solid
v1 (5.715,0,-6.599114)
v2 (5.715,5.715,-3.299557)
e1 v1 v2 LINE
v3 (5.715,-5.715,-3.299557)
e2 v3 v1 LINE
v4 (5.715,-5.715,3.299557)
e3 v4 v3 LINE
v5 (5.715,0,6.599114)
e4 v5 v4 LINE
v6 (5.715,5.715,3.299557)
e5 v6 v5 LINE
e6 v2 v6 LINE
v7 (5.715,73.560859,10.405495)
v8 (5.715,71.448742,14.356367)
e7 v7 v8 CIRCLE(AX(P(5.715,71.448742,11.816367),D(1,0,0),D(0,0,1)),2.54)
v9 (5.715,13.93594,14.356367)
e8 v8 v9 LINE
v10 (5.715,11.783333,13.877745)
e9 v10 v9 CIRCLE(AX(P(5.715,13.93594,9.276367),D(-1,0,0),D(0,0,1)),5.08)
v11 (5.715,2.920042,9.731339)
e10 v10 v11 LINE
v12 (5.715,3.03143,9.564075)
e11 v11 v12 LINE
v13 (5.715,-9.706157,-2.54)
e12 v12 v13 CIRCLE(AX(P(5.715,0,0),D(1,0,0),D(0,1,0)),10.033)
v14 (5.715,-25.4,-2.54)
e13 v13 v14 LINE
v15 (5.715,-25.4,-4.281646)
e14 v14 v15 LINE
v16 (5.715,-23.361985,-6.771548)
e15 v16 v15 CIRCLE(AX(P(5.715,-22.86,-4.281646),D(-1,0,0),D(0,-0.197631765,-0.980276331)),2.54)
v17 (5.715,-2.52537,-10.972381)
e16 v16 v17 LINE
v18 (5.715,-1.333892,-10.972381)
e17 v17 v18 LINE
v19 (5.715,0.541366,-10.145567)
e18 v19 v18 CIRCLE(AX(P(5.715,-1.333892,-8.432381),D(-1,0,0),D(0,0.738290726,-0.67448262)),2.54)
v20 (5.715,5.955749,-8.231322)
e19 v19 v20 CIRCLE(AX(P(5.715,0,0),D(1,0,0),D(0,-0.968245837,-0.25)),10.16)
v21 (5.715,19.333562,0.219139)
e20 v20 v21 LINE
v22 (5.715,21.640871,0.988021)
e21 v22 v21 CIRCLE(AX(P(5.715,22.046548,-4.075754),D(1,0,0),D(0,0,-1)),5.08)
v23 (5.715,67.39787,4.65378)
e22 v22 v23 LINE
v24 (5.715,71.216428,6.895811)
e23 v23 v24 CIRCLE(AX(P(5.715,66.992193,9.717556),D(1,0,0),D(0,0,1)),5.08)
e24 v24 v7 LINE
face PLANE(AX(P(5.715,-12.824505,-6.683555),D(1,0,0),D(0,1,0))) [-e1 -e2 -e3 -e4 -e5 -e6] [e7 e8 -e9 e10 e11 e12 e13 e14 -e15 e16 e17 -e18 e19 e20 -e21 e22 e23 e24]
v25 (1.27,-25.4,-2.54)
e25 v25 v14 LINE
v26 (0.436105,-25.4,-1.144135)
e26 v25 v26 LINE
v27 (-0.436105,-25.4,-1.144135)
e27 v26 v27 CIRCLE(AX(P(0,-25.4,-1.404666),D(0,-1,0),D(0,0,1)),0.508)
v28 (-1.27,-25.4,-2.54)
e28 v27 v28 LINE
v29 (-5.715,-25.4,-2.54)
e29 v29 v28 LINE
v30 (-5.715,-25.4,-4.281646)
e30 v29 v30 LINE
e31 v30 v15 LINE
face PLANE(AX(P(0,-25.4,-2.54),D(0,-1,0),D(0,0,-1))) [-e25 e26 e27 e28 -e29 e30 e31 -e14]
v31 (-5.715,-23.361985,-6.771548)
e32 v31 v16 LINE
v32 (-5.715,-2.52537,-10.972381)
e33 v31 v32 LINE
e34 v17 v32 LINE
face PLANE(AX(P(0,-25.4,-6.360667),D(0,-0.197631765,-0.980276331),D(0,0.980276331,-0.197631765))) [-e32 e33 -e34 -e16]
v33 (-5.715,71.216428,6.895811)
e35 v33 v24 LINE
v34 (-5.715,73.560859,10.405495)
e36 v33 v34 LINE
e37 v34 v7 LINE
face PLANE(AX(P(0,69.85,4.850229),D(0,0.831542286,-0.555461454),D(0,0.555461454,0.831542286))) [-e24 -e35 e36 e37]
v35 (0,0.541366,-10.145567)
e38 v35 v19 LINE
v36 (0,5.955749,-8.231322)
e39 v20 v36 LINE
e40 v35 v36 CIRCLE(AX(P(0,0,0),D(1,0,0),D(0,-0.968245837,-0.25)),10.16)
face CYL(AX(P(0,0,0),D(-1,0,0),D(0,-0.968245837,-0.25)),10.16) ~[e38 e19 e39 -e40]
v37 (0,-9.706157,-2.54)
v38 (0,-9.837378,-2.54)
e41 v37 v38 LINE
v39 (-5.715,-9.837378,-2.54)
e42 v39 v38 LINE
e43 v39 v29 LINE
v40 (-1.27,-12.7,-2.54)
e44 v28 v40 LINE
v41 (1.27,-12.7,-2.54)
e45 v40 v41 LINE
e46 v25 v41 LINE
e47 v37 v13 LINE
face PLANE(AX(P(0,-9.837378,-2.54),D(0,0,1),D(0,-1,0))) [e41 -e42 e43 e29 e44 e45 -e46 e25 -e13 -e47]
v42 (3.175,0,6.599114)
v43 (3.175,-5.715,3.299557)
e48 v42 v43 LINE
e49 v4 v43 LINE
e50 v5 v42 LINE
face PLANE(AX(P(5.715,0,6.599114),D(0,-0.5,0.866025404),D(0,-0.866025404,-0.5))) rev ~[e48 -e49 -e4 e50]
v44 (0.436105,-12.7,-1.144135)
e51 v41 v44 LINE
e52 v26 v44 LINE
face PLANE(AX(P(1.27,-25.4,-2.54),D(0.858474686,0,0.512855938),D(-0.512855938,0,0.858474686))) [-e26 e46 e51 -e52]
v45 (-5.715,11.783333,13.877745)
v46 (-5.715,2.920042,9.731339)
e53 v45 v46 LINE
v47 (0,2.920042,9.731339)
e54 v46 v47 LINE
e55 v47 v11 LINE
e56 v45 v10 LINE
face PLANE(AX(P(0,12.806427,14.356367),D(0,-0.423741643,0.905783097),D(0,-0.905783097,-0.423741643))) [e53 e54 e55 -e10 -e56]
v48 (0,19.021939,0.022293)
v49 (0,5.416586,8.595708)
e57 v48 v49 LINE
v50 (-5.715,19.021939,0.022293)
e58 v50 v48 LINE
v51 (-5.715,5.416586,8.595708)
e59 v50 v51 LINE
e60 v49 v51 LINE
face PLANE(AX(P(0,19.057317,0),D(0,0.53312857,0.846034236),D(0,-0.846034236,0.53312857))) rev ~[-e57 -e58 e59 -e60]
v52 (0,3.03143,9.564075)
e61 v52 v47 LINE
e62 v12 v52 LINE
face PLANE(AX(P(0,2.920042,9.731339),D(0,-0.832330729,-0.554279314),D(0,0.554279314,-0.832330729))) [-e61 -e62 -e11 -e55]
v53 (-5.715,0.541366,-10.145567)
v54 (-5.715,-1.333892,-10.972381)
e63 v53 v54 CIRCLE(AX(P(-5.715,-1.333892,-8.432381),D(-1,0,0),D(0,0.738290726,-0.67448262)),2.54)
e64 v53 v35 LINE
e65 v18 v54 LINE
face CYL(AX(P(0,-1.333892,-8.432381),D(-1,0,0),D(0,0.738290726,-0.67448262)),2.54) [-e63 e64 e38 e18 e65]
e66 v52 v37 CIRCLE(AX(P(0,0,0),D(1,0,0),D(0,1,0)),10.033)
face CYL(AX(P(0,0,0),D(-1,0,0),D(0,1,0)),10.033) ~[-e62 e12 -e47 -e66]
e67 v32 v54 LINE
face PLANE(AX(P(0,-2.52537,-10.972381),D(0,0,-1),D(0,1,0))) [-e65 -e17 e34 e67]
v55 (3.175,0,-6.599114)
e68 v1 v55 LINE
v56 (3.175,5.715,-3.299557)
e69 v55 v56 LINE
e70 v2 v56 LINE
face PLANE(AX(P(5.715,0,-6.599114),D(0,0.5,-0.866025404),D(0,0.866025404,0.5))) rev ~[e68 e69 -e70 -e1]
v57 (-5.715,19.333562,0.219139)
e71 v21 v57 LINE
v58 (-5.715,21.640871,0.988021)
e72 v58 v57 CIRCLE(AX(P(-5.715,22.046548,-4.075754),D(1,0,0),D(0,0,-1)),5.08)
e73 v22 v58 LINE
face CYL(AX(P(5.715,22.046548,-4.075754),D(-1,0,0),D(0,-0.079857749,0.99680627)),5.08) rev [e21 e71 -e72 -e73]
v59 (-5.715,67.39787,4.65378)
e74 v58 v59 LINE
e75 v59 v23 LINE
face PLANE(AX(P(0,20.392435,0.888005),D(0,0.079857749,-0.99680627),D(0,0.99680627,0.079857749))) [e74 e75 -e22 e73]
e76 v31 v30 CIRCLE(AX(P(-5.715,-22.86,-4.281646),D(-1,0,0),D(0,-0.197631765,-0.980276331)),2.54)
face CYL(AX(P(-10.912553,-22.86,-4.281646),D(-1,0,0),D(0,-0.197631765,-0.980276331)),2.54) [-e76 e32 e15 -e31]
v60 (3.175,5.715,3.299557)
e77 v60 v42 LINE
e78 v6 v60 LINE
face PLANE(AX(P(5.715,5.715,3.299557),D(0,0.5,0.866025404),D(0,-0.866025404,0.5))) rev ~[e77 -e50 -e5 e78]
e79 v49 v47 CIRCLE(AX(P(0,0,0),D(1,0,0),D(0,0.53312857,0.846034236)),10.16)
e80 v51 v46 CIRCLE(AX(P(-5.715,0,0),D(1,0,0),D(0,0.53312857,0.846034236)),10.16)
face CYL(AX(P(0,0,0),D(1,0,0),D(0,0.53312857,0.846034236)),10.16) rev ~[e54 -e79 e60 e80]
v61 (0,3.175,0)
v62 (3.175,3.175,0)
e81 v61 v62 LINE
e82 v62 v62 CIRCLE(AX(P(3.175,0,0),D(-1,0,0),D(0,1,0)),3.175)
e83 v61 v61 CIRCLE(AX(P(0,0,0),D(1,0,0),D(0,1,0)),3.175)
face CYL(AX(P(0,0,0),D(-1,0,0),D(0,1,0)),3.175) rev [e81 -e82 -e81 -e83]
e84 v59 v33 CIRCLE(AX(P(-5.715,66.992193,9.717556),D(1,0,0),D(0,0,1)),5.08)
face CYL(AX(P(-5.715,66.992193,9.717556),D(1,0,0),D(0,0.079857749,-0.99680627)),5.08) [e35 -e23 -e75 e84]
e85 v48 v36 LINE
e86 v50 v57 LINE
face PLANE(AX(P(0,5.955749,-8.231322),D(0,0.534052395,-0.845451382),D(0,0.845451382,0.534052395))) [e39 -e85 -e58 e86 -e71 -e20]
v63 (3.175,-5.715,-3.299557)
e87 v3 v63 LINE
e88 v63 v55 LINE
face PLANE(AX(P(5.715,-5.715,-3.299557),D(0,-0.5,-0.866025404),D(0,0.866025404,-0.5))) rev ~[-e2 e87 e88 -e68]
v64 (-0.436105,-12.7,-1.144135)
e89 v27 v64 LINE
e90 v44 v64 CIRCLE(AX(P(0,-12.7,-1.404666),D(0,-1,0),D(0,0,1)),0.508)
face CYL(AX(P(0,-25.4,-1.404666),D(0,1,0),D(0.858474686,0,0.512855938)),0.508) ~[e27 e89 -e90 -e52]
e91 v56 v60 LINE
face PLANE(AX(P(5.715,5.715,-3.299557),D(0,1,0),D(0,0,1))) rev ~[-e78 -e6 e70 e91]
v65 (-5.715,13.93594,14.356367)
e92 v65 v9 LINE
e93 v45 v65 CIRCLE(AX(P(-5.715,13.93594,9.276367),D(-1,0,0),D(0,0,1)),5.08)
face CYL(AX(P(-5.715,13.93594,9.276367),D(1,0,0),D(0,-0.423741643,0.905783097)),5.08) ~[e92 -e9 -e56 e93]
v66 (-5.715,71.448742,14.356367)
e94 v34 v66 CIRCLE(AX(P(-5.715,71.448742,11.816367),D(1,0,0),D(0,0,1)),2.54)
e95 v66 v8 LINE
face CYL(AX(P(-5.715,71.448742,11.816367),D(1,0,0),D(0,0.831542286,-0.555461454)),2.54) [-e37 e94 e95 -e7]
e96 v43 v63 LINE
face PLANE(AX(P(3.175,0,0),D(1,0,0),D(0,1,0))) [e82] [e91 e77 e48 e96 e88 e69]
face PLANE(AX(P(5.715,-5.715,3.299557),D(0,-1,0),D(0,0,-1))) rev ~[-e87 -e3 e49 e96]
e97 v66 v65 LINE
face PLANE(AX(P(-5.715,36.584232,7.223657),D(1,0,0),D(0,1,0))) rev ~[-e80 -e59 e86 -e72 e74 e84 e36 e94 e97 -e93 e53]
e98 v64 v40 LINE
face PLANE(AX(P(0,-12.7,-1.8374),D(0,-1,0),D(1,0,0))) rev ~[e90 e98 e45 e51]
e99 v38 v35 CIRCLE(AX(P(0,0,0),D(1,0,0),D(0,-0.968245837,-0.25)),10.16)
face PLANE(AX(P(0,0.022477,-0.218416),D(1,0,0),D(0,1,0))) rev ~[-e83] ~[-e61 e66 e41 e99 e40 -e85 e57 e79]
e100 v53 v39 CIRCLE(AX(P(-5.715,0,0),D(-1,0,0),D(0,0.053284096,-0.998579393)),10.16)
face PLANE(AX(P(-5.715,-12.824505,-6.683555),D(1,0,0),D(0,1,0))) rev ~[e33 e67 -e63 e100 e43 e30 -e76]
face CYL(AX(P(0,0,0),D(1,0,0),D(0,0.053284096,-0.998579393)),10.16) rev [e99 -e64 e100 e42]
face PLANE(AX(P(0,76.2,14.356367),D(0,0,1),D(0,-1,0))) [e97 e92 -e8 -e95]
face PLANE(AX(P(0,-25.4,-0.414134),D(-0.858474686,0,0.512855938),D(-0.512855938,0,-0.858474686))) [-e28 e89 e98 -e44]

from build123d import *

# Parameters (mm, degrees)
F2_DEPTH     = 5.715
F3_R         = 5.08
F4_R         = 2.54
F0_R         = 3.175
F5_DEPTH     = 5.715
F7_DEPTH     = 25.4
F9_DEPTH     = 5.715
F10_T1_DEPTH = 10.4031462071
F10_T3_DEPTH = 10.4031460084
F10_T5_DEPTH = 21.8251062119
F12_DEPTH    = 12.7
F13_R        = 0.508
F15_DEPTH    = 2.54


# Not quite as in the source:
# - a fillet or chamfer that OpenCascade refuses, or shapes differently, is made with other operations: its cross-section is extruded or revolved along the edge and cut away or added


with BuildPart() as f2:
    # F1 (on Right) → F2 (new body, symmetric)
    with BuildSketch(Plane.YZ):
        Polygon((20.3924354673, 0.8880047341), (69.85, 4.8502287827), (76.2, 14.35636729), (12.8064267337, 14.35636729), (2.9200423986, 9.7313386741), (8.2383593544, 1.7451149179), (4.8682624474, -6.6303843632), (5.9557488763, -8.2313216024), align=None)
    extrude(amount=F2_DEPTH, both=True)

    # F3
    f3_edges = [f2.edges().sort_by_distance(p)[0] for p in [
        (0, 12.806427, 14.356367),
        (0, 69.85, 4.850229),
        (0, 20.392435, 0.888005),
    ]]
    fillet(f3_edges, radius=F3_R)

    # F4
    f4_edges = [f2.edges().sort_by_distance(p)[0] for p in [
        (0, 76.2, 14.356367),
    ]]
    fillet(f4_edges, radius=F4_R)

    # F0 (on Right) → F5 (join)
    with BuildSketch(Plane.YZ):
        with BuildLine():
            Line((10.16, 0), (10.033, 0))
            ThreePointArc((10.033, 0), (-1.2804712188, 9.9509538466), (-9.7061572726, -2.54))
            Line((-9.7061572726, -2.54), (-9.8373776994, -2.54))
            ThreePointArc((-9.8373776994, -2.54), (1.2802036116, -10.0790217141), (10.16, 0))
        make_face()
        Circle(F0_R, mode=Mode.SUBTRACT)
    extrude(amount=F5_DEPTH)

    # F6 (on Right) → F7 (cut)
    with BuildSketch(Plane.YZ):
        with BuildLine():
            Line((19.0573167056, 0), (5.4165862694, 8.5957078351))
            ThreePointArc((5.4165862694, 8.5957078351), (-10.1595718617, -0.0932715764), (5.5734885208, -8.4948116935))
            Line((5.5734885208, -8.4948116935), (19.0573167056, 0))
        make_face()
    extrude(amount=-F7_DEPTH, mode=Mode.SUBTRACT)

    # F8 (on Right) → F9 (join, symmetric)
    with BuildSketch(Plane.YZ):
        with BuildLine():
            Line((0.5413664183, -10.9723807834), (0.5413664183, -10.1455666378))
            ThreePointArc((0.5413664183, -10.1455666378), (-6.0054239987, -8.1951499434), (-9.8373776994, -2.54))
            Line((-9.8373776994, -2.54), (-25.4, -2.54))
            Line((-25.4, -2.54), (-25.4, -6.360667292))
            Line((-25.4, -6.360667292), (-2.5253696451, -10.9723807834))
            Line((-2.5253696451, -10.9723807834), (0.5413664183, -10.9723807834))
        make_face()
    extrude(amount=F9_DEPTH, both=True)

    # F10: fillet of radius 2.54 on 2 edges, made by hand

    # F10_s2 → F10_t1 (cut)
    with BuildSketch(Plane.YZ.offset(-10.4031461077)):
        with BuildLine():
            ThreePointArc((0.5413664183, -10.1455666378), (-0.3091706163, -10.7565034211), (-1.3338920247, -10.9723807834))
            Line((-1.3338920247, -10.9723807834), (0.5413664183, -10.9723807834))
            Line((0.5413664183, -10.9723807834), (0.5413664183, -10.1455666378))
        make_face()
    extrude(amount=F10_T1_DEPTH, mode=Mode.SUBTRACT)

    # F10_s4 → F10_t3 (cut)
    with BuildSketch(Plane.YZ.offset(9.94e-08)):
        with BuildLine():
            ThreePointArc((0.5413664183, -10.1455666378), (-0.3091706163, -10.7565034211), (-1.3338920247, -10.9723807834))
            Line((-1.3338920247, -10.9723807834), (0.5413664183, -10.9723807834))
            Line((0.5413664183, -10.9723807834), (0.5413664183, -10.1455666378))
        make_face()
    extrude(amount=F10_T3_DEPTH, mode=Mode.SUBTRACT)

    # F10_s6 → F10_t5 (cut)
    with BuildSketch(Plane.YZ.offset(-10.912553106)):
        with BuildLine():
            ThreePointArc((-23.3619846843, -6.7715479306), (-24.8255331463, -5.8904591062), (-25.4, -4.2816460496))
            Line((-25.4, -4.2816460496), (-25.4, -6.360667292))
            Line((-25.4, -6.360667292), (-23.3619846843, -6.7715479306))
        make_face()
    extrude(amount=F10_T5_DEPTH, mode=Mode.SUBTRACT)

    # F11 (on face) → F12 (join)
    with BuildSketch(Plane.XZ.offset(25.4)):
        Polygon((0, -0.4141342943), (-1.27, -2.54), (1.27, -2.54), align=None)
    extrude(amount=-F12_DEPTH)

    # F13
    f13_edges = [f2.edges().sort_by_distance(p)[0] for p in [
        (0, -19.05, -0.414134),
    ]]
    fillet(f13_edges, radius=F13_R)

    # F14 (on face) → F15 (cut)
    with BuildSketch(Plane.YZ.offset(5.715)):
        Polygon((5.715, -3.2995567884), (5.715, 3.2995567884), (0, 6.5991135768), (-5.715, 3.2995567884), (-5.715, -3.2995567884), (0, -6.5991135768), align=None)
    extrude(amount=-F15_DEPTH, mode=Mode.SUBTRACT)


solid = f2.part
